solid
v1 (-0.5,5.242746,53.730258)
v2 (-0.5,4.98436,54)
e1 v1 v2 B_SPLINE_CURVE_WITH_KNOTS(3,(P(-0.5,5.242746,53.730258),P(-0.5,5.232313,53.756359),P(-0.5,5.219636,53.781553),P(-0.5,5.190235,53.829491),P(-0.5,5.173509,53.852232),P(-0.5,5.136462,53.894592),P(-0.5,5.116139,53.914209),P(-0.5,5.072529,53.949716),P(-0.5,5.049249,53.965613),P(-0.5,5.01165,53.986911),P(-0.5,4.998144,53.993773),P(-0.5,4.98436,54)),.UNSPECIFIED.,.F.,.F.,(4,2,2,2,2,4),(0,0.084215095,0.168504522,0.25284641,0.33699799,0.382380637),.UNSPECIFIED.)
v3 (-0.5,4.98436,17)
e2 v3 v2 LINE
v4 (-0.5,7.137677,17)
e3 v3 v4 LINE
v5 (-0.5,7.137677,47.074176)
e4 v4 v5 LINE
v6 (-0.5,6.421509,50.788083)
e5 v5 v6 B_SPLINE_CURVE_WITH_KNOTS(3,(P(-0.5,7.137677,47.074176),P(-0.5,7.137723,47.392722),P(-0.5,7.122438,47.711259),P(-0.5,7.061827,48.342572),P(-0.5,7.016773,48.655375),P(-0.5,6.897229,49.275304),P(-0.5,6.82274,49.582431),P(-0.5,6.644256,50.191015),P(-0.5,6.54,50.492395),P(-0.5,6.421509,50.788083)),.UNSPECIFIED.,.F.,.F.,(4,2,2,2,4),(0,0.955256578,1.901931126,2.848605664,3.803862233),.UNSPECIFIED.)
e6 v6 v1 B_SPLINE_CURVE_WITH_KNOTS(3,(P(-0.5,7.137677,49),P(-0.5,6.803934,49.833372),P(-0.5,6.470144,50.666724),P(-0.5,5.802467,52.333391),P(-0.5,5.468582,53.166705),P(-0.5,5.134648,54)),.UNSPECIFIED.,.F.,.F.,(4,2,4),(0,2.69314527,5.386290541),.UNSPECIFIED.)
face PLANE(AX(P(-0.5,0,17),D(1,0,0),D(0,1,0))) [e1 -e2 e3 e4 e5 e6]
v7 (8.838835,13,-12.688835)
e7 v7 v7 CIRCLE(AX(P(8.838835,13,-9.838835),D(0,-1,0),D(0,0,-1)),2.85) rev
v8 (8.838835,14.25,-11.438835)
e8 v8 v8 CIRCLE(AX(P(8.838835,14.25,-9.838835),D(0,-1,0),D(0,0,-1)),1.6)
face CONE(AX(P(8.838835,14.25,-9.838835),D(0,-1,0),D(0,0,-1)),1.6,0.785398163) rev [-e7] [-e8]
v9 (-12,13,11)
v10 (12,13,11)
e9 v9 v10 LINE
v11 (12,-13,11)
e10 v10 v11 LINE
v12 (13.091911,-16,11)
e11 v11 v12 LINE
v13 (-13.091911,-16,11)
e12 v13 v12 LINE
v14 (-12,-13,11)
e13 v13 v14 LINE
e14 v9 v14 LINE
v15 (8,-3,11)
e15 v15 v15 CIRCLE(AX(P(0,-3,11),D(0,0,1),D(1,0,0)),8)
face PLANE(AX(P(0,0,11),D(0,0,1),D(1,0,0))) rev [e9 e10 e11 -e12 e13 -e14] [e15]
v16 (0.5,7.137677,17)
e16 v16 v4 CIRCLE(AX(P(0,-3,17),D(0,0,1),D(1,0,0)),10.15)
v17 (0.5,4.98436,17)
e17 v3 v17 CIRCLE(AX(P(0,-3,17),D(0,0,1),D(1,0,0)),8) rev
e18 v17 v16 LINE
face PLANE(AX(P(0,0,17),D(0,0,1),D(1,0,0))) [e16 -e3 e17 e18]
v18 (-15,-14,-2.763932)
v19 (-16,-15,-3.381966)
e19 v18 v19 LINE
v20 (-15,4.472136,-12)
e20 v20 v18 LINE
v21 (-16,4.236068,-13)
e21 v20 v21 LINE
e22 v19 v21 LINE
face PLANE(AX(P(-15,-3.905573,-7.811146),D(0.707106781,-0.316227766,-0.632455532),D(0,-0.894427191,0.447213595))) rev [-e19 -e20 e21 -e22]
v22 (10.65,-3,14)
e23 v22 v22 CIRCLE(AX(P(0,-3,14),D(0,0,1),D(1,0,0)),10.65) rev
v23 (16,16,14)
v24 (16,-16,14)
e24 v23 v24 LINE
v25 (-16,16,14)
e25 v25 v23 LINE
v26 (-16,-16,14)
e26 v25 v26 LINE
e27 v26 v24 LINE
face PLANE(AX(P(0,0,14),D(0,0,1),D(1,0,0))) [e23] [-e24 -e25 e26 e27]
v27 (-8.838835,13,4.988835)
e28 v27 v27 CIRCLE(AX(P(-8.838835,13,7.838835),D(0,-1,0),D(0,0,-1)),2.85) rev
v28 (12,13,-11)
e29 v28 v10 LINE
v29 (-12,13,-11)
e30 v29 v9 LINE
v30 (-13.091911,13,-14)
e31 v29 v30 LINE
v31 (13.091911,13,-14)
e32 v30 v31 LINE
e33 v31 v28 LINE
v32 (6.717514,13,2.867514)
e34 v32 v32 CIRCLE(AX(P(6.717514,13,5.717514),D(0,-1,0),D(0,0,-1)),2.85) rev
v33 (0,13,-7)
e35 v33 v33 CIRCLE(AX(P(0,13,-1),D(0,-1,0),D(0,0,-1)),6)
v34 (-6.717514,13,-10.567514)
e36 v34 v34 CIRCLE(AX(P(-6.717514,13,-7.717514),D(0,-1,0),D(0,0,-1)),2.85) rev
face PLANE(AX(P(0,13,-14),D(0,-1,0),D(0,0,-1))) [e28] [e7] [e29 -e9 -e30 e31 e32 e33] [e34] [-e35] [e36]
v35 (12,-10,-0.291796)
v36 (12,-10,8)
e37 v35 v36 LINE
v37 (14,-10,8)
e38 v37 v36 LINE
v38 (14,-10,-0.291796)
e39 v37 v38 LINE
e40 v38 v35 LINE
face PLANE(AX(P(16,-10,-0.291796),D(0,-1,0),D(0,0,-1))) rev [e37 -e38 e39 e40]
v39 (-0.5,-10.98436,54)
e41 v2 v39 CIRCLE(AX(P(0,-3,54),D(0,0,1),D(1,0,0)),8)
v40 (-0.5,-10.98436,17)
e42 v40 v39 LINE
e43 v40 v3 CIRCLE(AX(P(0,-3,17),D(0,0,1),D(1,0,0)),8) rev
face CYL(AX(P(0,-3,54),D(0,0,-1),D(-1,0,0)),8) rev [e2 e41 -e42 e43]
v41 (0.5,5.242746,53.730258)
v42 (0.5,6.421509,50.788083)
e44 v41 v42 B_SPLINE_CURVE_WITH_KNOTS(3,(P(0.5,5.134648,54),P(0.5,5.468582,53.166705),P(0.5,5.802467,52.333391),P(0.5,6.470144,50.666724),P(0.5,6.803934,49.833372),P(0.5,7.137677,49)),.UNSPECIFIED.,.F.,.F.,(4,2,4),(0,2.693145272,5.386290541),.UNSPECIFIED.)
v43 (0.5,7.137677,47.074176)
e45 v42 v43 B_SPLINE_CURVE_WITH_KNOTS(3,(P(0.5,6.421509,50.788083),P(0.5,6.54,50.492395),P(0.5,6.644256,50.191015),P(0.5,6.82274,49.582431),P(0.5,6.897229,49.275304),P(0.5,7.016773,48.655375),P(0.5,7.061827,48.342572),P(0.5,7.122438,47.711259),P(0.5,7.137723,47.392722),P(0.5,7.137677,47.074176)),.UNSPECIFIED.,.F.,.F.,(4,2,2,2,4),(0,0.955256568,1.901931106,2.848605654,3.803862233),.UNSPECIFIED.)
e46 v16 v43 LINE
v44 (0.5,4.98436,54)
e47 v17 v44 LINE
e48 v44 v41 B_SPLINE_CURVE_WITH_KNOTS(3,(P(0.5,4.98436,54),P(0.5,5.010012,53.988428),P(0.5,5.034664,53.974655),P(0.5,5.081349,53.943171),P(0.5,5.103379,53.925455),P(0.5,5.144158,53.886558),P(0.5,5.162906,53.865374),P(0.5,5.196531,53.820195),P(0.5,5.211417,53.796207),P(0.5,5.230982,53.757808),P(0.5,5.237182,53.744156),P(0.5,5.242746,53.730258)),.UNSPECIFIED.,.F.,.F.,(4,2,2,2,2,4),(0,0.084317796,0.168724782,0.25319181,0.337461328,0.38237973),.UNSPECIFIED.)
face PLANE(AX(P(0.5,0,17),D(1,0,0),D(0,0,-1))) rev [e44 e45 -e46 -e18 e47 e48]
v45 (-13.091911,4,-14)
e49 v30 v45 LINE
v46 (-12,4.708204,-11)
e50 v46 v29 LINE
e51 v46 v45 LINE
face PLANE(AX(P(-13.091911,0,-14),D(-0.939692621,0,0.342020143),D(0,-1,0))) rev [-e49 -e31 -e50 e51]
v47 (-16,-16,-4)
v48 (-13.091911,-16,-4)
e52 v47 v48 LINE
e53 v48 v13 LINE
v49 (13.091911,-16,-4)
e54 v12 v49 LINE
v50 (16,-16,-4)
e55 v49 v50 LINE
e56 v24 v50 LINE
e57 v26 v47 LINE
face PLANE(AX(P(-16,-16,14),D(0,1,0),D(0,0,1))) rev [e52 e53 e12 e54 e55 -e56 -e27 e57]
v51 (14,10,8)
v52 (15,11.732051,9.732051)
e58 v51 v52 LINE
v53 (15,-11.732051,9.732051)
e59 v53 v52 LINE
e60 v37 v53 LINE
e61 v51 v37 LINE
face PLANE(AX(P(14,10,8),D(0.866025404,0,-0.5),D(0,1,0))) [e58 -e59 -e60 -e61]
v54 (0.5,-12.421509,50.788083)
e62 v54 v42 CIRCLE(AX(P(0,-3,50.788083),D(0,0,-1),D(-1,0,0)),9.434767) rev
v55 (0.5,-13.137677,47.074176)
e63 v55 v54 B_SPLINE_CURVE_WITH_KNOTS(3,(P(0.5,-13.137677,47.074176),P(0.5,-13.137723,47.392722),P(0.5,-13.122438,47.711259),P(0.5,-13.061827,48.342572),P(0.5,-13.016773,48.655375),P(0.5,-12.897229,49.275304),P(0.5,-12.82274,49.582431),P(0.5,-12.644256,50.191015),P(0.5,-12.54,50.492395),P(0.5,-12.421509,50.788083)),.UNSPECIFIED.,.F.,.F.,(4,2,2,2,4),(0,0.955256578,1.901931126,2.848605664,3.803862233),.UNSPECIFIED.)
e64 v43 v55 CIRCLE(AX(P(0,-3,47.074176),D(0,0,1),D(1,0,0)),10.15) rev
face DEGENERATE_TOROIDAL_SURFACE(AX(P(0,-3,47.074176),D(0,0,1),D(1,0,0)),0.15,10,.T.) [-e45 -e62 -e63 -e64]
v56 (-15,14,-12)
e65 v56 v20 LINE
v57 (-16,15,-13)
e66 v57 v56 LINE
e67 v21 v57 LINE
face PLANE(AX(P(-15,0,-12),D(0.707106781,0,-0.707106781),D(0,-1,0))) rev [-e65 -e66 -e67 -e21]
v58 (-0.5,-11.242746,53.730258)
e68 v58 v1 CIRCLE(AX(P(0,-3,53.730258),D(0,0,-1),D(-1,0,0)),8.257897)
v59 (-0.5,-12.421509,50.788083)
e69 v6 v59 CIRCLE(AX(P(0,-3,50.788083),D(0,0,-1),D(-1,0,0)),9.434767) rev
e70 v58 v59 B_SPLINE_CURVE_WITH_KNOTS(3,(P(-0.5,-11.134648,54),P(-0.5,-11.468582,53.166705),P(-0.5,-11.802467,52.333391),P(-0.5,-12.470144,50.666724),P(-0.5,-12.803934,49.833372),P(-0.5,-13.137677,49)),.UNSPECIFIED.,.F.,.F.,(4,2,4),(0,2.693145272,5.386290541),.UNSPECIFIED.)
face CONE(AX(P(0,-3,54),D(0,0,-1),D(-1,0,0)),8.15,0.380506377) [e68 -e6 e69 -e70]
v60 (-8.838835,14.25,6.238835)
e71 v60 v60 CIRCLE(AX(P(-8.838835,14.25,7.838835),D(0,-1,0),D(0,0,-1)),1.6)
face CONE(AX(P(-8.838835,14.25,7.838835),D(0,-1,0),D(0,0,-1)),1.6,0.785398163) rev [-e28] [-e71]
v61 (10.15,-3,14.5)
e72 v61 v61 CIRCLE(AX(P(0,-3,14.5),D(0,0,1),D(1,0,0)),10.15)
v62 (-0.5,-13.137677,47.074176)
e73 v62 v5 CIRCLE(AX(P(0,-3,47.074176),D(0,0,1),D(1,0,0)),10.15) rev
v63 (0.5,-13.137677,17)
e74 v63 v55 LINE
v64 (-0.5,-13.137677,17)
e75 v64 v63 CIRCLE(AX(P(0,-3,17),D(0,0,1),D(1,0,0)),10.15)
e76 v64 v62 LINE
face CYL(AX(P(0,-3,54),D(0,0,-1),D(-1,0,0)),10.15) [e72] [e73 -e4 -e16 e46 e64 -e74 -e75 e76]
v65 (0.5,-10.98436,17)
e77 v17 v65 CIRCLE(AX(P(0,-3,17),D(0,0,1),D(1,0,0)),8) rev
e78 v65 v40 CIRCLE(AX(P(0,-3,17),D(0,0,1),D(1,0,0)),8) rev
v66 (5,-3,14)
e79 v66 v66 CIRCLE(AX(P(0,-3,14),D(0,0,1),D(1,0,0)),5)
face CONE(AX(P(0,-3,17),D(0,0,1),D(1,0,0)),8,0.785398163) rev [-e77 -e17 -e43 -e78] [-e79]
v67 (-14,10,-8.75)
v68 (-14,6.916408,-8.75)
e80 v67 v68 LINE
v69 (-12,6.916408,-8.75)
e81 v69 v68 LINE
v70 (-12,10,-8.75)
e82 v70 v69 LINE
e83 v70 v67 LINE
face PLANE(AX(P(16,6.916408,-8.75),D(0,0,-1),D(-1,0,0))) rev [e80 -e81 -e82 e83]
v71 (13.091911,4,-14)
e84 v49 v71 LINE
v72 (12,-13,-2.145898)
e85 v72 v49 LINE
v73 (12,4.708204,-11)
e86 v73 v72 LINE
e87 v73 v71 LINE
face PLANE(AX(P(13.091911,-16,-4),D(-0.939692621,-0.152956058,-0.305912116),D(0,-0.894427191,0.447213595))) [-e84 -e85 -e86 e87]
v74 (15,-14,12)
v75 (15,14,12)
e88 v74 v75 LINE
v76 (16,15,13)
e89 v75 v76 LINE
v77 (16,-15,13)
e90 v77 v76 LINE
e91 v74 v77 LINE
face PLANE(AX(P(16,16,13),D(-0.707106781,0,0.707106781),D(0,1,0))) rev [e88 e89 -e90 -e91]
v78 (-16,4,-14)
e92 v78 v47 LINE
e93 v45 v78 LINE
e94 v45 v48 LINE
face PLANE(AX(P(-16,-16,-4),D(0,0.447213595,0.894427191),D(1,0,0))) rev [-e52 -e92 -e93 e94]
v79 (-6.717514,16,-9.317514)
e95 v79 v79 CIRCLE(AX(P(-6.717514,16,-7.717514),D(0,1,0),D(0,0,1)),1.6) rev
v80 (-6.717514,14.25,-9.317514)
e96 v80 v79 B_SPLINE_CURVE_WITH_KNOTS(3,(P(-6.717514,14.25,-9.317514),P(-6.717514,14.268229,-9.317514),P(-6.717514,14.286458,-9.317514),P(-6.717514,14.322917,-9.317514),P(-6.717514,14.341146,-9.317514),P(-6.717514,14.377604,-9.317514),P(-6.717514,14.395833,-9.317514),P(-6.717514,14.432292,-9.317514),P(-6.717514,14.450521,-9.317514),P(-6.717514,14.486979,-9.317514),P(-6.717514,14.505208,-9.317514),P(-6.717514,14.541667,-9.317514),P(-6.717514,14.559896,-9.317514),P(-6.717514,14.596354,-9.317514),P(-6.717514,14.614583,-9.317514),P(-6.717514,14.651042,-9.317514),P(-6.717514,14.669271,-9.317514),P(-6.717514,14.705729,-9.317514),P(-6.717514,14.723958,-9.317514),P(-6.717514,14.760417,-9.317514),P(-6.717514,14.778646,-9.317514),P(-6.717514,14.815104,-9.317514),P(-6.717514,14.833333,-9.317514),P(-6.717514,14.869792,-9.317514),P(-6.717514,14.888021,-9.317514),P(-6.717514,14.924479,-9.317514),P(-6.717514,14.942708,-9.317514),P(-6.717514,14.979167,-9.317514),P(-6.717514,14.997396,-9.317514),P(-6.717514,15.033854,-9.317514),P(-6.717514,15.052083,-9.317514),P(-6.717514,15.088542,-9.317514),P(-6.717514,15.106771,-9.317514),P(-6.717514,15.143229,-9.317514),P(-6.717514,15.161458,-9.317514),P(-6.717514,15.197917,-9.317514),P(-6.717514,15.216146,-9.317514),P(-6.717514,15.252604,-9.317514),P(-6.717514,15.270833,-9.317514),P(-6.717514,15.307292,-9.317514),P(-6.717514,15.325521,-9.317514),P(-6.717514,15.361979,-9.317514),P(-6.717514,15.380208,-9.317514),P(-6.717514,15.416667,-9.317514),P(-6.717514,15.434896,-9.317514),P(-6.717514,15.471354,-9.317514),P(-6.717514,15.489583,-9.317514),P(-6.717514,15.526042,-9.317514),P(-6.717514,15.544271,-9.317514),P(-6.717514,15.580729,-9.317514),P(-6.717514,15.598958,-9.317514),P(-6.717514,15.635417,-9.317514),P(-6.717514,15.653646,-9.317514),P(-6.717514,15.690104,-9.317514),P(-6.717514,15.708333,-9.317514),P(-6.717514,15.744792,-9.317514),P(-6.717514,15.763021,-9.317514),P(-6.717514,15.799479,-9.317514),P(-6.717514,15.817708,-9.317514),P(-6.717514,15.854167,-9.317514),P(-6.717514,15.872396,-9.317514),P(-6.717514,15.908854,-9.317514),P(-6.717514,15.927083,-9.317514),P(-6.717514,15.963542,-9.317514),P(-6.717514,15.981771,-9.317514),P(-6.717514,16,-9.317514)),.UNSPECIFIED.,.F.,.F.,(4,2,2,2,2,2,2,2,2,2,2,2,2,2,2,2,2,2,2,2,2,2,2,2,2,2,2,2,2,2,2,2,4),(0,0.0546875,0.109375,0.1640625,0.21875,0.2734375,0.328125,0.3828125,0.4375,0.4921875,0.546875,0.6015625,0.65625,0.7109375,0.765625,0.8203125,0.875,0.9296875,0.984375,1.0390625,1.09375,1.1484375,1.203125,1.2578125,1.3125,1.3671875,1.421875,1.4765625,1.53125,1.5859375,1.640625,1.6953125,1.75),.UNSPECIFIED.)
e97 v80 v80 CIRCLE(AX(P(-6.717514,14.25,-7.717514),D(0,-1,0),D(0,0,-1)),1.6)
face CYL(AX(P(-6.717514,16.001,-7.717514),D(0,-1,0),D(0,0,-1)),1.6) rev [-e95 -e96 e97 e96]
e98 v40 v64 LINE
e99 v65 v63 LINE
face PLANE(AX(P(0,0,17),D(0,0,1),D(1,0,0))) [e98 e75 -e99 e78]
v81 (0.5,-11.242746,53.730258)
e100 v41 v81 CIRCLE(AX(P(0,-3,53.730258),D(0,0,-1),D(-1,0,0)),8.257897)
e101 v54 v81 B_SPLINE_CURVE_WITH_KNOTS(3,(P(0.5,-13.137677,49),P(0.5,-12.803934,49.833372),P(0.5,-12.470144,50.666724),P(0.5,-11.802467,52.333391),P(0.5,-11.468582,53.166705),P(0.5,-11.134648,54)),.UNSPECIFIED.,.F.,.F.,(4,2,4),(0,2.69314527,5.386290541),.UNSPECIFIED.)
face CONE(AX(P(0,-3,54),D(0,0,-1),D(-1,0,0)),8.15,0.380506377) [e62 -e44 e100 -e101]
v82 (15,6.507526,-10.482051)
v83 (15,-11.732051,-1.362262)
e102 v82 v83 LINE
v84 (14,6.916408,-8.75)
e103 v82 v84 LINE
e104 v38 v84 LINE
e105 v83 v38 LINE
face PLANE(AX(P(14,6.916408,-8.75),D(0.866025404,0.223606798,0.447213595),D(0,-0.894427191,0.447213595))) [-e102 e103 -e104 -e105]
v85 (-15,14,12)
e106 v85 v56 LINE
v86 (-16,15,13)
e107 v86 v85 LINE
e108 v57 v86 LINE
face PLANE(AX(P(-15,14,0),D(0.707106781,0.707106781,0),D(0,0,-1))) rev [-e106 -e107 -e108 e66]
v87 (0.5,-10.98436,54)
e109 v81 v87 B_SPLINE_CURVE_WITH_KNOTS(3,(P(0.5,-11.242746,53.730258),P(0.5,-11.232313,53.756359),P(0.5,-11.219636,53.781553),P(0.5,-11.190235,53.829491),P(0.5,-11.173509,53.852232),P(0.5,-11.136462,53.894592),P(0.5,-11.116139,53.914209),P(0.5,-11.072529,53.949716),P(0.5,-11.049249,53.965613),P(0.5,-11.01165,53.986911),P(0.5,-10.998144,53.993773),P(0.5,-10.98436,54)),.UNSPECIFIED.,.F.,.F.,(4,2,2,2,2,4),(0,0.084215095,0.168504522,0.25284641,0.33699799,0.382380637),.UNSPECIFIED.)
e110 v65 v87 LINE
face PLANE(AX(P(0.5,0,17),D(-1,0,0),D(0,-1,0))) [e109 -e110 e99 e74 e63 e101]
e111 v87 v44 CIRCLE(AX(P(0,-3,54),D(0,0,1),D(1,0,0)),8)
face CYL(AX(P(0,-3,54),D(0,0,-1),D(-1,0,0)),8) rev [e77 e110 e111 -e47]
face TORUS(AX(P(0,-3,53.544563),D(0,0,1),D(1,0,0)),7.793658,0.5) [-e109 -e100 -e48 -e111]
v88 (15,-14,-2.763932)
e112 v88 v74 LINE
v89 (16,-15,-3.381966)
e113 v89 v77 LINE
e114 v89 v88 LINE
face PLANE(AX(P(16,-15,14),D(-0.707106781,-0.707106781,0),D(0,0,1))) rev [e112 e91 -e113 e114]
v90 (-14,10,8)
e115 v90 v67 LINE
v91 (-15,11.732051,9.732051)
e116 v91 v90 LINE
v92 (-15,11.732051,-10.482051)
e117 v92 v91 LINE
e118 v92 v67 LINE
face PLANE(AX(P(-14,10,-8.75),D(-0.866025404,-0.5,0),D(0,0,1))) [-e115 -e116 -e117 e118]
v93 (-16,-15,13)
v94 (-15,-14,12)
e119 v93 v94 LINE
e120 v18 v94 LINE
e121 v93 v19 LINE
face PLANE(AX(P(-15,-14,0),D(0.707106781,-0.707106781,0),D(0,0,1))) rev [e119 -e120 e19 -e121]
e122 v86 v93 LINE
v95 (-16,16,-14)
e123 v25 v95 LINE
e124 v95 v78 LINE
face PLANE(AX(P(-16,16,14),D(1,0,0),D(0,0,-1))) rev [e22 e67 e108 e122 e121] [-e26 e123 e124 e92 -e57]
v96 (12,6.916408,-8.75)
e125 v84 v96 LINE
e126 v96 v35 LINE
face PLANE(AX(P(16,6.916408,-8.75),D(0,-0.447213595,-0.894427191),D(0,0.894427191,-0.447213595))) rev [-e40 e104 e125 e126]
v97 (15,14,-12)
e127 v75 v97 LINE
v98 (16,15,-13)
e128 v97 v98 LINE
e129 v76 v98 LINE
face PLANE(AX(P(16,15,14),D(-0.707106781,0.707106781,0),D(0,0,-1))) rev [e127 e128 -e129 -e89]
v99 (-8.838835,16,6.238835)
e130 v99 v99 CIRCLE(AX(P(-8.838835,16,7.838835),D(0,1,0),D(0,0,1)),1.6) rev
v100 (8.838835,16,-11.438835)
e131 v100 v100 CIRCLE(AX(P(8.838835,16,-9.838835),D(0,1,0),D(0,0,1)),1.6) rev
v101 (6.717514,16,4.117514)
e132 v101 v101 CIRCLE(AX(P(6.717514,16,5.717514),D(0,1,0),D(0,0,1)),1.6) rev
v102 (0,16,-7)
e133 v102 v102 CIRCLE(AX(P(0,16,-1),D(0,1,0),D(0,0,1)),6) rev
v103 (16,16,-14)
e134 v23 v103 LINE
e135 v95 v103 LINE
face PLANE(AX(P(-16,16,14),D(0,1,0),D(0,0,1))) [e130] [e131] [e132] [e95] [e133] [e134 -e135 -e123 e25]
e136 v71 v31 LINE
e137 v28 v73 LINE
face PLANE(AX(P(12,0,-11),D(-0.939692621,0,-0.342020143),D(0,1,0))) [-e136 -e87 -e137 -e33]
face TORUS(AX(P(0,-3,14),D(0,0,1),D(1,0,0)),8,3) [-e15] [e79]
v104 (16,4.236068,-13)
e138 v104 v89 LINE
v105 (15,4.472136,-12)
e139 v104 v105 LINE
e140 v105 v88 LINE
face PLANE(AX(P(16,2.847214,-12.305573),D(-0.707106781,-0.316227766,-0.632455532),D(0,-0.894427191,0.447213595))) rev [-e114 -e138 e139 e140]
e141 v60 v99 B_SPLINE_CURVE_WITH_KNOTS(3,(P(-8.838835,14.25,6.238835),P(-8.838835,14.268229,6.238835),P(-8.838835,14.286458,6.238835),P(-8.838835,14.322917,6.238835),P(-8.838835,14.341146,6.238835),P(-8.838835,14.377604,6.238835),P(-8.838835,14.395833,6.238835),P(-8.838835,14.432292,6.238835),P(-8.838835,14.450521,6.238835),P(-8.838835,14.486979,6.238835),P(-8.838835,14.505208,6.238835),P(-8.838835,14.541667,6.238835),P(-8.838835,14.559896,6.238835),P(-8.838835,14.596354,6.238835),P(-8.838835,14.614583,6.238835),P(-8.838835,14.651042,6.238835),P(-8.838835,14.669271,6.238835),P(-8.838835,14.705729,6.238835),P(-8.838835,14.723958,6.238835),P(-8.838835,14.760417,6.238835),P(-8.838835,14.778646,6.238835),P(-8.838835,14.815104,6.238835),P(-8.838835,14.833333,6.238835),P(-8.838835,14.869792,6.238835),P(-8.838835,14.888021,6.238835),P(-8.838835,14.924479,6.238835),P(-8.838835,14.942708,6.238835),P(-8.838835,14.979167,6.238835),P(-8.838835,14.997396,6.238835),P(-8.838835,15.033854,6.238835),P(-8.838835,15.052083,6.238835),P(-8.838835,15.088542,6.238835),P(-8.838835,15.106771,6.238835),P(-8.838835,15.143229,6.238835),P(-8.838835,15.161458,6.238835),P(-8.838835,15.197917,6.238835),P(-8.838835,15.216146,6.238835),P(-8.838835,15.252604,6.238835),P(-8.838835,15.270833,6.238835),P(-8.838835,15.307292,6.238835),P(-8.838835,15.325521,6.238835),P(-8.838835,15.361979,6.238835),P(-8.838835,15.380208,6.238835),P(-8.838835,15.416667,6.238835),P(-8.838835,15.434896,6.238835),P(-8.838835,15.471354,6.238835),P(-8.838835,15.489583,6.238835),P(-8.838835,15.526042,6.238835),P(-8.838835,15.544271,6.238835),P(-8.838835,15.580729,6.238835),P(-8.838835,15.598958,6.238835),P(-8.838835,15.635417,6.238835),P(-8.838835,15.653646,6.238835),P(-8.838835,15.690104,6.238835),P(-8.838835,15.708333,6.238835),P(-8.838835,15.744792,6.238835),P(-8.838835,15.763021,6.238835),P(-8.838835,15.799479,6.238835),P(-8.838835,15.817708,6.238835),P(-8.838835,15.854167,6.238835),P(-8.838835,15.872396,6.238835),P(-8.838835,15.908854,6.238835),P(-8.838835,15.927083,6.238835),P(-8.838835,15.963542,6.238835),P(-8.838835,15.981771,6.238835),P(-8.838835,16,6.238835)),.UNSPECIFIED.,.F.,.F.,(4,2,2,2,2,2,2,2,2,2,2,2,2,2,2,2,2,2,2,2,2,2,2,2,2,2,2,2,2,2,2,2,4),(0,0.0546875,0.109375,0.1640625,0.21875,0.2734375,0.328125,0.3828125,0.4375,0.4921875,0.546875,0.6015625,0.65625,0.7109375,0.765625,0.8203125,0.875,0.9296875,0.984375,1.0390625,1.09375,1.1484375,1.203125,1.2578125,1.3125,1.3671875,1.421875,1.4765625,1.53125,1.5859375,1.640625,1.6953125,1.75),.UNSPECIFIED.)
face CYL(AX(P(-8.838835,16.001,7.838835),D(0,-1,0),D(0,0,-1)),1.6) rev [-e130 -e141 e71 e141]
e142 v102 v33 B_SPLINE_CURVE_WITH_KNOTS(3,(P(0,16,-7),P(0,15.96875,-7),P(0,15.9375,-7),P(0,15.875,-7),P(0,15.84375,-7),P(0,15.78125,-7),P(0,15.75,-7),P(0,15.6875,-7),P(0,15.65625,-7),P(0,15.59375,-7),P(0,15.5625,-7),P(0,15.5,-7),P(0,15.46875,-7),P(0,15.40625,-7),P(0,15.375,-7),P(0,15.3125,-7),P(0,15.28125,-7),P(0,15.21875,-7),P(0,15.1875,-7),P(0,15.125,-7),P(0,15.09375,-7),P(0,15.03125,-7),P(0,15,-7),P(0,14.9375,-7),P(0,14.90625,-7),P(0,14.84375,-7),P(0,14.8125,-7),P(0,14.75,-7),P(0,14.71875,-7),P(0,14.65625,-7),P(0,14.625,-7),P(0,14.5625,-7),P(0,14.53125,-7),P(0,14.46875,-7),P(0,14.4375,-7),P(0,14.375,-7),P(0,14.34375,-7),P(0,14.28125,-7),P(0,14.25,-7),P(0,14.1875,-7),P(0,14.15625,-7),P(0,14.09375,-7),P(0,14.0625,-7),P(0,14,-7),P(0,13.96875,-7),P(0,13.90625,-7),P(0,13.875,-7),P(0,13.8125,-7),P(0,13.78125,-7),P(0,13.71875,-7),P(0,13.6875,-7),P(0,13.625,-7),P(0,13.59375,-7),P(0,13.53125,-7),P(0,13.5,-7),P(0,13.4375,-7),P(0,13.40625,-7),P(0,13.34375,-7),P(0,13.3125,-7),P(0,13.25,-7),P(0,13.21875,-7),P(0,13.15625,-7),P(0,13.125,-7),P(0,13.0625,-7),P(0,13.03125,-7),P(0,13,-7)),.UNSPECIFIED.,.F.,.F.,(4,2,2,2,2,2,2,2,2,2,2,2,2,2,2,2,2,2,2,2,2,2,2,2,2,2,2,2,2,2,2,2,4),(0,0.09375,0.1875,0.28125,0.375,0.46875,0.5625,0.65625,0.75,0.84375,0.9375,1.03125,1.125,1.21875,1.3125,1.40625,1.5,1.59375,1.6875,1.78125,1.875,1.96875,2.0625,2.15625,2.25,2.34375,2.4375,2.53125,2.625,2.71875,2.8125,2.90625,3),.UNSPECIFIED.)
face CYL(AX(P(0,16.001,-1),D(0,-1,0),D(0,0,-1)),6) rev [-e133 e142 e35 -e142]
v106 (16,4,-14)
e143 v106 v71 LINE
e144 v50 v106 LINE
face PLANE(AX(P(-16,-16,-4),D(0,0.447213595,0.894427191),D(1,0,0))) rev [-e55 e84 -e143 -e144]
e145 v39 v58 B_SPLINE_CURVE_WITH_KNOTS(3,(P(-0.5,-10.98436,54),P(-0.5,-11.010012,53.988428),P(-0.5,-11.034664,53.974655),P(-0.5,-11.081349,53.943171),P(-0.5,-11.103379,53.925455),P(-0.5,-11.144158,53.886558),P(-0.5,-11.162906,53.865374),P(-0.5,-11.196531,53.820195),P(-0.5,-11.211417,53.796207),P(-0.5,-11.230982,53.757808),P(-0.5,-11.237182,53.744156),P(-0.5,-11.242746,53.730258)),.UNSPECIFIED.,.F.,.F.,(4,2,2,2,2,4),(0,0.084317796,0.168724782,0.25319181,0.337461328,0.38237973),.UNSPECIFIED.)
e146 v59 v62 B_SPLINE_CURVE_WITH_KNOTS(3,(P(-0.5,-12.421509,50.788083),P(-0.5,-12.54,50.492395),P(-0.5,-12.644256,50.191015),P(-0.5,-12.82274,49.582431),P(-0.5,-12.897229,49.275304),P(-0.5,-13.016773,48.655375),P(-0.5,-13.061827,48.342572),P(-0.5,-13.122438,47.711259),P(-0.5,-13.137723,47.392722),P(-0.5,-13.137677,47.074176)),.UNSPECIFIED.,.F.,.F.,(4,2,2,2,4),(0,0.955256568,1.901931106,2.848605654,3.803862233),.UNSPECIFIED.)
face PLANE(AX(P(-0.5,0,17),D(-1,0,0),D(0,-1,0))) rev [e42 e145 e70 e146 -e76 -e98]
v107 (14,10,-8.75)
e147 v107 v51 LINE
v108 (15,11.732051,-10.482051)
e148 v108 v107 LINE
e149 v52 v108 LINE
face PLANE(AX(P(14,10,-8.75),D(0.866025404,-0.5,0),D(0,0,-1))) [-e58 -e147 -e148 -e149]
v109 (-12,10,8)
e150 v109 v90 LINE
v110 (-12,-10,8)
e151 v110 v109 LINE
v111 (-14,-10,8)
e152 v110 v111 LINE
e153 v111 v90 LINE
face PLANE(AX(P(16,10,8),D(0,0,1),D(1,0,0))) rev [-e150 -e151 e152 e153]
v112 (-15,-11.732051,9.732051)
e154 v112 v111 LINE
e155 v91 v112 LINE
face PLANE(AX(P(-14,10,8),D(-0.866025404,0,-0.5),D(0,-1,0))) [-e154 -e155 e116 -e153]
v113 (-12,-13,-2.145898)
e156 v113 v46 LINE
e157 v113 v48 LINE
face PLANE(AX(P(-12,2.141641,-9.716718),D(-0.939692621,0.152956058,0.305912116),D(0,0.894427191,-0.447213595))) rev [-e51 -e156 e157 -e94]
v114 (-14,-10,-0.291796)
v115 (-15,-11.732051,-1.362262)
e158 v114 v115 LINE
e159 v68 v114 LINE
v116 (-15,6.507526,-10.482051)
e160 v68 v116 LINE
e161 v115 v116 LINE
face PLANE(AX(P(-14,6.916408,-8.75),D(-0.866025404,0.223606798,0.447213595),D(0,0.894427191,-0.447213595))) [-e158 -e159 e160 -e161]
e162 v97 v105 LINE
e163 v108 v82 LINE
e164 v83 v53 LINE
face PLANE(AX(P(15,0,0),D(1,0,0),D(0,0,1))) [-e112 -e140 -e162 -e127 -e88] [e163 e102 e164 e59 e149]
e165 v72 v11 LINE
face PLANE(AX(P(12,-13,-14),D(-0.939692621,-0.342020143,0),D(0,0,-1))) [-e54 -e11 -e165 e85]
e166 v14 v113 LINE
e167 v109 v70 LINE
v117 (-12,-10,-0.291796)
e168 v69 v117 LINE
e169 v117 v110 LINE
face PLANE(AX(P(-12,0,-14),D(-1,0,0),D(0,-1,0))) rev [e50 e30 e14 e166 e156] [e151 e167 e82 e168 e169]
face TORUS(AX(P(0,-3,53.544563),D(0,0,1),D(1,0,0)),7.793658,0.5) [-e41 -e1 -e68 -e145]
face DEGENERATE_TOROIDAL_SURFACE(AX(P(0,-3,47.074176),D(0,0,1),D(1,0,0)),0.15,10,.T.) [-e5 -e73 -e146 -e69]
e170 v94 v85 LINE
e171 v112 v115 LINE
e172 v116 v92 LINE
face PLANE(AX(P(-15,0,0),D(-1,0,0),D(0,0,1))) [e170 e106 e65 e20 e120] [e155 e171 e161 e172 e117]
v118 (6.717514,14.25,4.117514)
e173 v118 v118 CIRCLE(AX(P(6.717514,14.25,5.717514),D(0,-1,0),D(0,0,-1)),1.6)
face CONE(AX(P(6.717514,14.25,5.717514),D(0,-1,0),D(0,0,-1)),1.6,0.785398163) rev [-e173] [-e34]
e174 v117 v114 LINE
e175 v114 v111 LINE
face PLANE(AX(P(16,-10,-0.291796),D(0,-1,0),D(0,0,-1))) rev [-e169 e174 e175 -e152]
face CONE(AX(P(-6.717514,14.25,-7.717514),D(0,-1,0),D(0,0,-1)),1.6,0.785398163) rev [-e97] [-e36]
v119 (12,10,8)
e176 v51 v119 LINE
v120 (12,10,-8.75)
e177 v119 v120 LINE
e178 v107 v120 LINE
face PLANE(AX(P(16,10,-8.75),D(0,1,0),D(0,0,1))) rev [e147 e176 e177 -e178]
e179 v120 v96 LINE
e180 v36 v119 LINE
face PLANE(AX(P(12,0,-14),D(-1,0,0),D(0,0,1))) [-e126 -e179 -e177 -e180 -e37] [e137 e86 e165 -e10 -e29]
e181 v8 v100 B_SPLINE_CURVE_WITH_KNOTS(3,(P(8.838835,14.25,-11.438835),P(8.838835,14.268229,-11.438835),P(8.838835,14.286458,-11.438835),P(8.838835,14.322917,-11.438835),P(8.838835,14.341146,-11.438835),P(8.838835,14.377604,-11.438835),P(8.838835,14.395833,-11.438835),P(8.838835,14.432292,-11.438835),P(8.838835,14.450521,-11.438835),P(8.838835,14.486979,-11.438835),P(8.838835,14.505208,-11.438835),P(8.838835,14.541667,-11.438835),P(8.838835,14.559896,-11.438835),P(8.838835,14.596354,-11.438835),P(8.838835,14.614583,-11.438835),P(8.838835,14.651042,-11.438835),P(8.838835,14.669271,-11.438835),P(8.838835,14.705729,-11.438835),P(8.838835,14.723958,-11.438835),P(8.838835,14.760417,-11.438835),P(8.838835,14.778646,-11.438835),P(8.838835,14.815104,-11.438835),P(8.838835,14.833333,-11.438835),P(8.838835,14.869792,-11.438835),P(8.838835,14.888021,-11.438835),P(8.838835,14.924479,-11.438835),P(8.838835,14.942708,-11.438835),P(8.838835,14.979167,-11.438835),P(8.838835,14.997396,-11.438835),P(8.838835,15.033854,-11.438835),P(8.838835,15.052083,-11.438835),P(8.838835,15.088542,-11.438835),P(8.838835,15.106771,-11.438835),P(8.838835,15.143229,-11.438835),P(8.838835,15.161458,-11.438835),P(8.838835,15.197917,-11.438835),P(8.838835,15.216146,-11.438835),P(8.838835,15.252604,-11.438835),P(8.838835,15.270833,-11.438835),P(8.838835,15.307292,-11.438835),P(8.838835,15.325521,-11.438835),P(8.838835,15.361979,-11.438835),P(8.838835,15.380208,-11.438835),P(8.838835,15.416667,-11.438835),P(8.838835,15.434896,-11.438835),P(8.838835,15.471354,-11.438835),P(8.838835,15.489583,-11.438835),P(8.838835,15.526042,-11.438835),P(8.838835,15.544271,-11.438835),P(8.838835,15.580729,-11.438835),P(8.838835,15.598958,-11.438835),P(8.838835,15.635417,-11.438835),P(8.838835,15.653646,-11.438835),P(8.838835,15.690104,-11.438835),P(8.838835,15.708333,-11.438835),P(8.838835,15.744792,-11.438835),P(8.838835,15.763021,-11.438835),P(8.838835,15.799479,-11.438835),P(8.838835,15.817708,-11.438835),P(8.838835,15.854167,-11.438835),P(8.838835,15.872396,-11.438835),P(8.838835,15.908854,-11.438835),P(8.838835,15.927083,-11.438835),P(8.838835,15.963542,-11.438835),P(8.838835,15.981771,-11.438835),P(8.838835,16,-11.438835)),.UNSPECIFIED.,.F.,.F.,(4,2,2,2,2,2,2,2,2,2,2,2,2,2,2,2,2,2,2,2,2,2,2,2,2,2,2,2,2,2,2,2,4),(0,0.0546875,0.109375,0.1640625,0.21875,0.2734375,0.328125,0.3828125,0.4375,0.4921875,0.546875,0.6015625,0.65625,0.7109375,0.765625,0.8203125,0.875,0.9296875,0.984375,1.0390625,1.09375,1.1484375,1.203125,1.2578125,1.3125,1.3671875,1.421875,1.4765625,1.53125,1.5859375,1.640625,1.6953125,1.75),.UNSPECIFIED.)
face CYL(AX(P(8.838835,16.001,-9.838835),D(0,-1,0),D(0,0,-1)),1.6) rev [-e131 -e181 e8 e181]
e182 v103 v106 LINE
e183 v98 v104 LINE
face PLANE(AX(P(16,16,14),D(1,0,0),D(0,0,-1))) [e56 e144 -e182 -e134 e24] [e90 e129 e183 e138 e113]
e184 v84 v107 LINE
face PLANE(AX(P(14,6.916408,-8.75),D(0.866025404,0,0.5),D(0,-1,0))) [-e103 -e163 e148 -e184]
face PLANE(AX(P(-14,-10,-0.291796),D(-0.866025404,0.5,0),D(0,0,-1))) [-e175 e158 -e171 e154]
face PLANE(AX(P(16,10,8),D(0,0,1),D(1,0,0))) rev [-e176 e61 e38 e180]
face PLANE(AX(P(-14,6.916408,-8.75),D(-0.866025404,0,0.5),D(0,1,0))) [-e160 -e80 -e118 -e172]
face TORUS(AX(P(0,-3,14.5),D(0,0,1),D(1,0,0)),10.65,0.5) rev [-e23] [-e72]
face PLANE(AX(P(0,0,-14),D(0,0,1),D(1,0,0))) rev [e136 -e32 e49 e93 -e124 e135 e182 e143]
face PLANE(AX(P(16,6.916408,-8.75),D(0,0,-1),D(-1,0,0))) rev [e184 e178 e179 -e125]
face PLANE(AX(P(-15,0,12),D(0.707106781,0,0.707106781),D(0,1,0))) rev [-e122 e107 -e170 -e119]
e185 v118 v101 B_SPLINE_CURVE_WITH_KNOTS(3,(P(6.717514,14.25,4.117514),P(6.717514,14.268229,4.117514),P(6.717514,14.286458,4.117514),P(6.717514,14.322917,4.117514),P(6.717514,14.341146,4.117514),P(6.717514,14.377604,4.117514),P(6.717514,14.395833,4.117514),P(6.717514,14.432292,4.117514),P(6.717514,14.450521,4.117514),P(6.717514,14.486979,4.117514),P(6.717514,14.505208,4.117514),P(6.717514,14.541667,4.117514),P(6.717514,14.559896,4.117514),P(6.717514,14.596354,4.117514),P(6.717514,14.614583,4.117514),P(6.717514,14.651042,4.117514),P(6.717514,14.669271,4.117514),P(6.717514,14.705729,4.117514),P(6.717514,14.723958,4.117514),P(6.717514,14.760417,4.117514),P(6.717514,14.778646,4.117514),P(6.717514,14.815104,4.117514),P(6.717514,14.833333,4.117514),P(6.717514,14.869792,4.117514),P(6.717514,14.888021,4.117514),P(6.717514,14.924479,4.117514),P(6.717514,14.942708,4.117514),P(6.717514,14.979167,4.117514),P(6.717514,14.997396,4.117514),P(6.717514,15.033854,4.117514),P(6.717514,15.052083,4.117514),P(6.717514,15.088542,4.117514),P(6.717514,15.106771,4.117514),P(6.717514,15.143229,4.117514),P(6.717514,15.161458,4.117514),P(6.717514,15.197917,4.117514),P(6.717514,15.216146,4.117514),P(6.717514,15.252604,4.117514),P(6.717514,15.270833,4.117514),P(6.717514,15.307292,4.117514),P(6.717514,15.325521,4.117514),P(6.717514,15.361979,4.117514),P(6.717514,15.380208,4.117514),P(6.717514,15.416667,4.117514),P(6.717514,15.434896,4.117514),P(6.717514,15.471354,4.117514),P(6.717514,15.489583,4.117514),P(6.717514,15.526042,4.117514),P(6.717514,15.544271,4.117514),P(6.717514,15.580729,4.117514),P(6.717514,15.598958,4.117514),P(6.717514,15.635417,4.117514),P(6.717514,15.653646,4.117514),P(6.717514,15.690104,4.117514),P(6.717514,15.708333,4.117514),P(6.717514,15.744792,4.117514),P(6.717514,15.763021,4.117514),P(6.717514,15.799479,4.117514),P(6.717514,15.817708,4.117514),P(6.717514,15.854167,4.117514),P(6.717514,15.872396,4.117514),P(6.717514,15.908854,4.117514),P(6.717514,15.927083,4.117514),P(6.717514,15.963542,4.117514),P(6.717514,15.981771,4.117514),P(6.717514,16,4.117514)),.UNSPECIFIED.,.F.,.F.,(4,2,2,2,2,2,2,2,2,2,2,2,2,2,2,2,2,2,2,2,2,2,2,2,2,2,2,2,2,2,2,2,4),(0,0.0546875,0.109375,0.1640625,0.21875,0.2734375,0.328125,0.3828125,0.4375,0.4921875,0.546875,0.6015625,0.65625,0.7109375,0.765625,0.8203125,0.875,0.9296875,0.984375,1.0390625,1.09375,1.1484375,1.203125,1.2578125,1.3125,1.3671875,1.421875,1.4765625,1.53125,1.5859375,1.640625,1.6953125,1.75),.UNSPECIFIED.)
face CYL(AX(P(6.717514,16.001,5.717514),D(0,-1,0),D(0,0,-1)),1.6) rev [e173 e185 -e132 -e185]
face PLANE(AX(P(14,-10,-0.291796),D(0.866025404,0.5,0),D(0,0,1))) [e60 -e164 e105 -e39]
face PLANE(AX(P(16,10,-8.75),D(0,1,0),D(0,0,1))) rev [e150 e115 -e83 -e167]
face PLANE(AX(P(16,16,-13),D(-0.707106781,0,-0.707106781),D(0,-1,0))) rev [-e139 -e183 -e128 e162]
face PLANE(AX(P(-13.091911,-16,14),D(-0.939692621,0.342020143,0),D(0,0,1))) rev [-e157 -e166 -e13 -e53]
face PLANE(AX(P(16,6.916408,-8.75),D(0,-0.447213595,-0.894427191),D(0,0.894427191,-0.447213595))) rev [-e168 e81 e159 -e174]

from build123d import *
from OCP.BRepFilletAPI import BRepFilletAPI_MakeChamfer

# Parameters (mm, degrees)
ESQUISSE1_W              = 32
ESQUISSE1_H              = 32
BOSS_EXTRU_1_DEPTH       = 14
CHANFREIN1_SIZE          = 20
CHANFREIN1_SIZE2         = 10
ENL_V_MAT_EXTRU_1_DEPTH  = 1
ESQUISSE11_W             = 12
ESQUISSE11_H             = 29
ENL_V_MAT_EXTRU_4_DEPTH  = 34.7194306
CHANFREIN41_SIZE         = 1
ENL_V_MAT_EXTRU_13_DEPTH = 38.589892258
CHANFREIN63_SIZE         = 1
CHANFREIN63_SIZE2        = 1.732050808
ESQUISSE32_R             = 10.15
ESQUISSE32_R_2           = 8
BOSS_EXTRU_2_DEPTH       = 40
ENL_V_START              = -37
ENL_V_MAT_EXTRU_17_DEPTH = 37
CHANFREIN50_SIZE         = 5
CHANFREIN50_SIZE2        = 2
CONG_4_R                 = 0.5
CONG_5_R                 = 10
CONG_6_R                 = 0.5
ENL_V_MAT_EXTRU_45_REACH = 65.348
ESQUISSE71_R             = 6
ESQUISSE71_R_2           = 1.6
CHANFREIN64_SIZE         = 1.25
CHAMFER1_SIZE            = 3
SKETCH4_R                = 5
CUT_EXTRUDE1_DEPTH       = 46.956501259
FILLET2_R                = 3
CHAMFER2_SIZE            = 3
CHAMFER2_SIZE2           = 1.091910703


# Some blends are built 0.0001 mm under size
with BuildPart() as part:
    # Esquisse1 → Boss.-Extru.1 (new, symmetric)
    with BuildSketch(Plane.XY):
        Rectangle(ESQUISSE1_W, ESQUISSE1_H)
    extrude(amount=BOSS_EXTRU_1_DEPTH, both=True)

    # Chanfrein1
    chanfrein1_edges = [part.edges().sort_by_distance(p)[0] for p in [
        (0, -16, -14),
    ]]
    chanfrein1_side = [part.faces().sort_by_distance(p)[0] for p in [
        (0, 0, -14),
    ]]
    chamfer(chanfrein1_edges, length=CHANFREIN1_SIZE, length2=CHANFREIN1_SIZE2, reference=chanfrein1_side[0])

    # Esquisse5 → Enlèv. mat.-Extru.1 (cut)
    with BuildSketch(Plane.ZY.offset(16)):
        Polygon((-12, 14), (-12, 4.472135955), (-2.763932023, -14), (12, -14), (12, 14), align=None)
    enl_v_mat_extru_1 = extrude(amount=-ENL_V_MAT_EXTRU_1_DEPTH, mode=Mode.SUBTRACT)

    # Symétrie1: Enlèv. mat.-Extru.1 across plane
    add(enl_v_mat_extru_1.mirror(Plane(origin=(0, 0, 0), x_dir=(0, 0, 1), z_dir=(1, 0, 0))), mode=Mode.SUBTRACT)

    # Esquisse11 → Enlèv. mat.-Extru.4 (cut, through all)
    with BuildSketch(Plane.XY.offset(11)):
        with Locations((-6, -1.5)):
            Rectangle(ESQUISSE11_W, ESQUISSE11_H)
        with Locations((6, -1.5)):
            Rectangle(ESQUISSE11_W, ESQUISSE11_H)
    extrude(amount=-ENL_V_MAT_EXTRU_4_DEPTH, mode=Mode.SUBTRACT)

    # Chanfrein41
    chanfrein41_edges = [part.edges().sort_by_distance(p)[0] for p in [
        (16, -4.763932023, -7.381966011),
        (16, 0, 12),
        (16, 14, 0),
        (16, 9.236067977, -12),
        (-16, 0, 12),
        (-16, -4.763932023, -7.381966011),
        (-16, 14, 0),
        (-16, 9.236067977, -12),
        (16, -14, 4.618033989),
        (-16, -14, 4.618033989),
    ]]
    chamfer(chanfrein41_edges, length=CHANFREIN41_SIZE - 0.0001)  # a hair under: the kernel refuses the full size

    # Esquisse24 → Enlèv. mat.-Extru.13 (cut, through all)
    with BuildSketch(Plane.ZY.offset(15)):
        Polygon((-8.75, 6.916407865), (-8.75, 10), (8, 10), (8, -10), (-0.291796068, -10), align=None)
    extrude(amount=-ENL_V_MAT_EXTRU_13_DEPTH, mode=Mode.SUBTRACT)

    # Chanfrein63: one chamfer whose edges measure the first distance from different faces: ONE call of the kernel's chamfer builder (chamfer() names one face for all edges)
    chanfrein63_edges_1 = [part.edges().sort_by_distance(p)[0] for p in [
        (15, 10, -0.375),
    ]]
    chanfrein63_side_1 = [part.faces().sort_by_distance(p)[0] for p in [
        (13.5, 10, -0.375),
    ]]
    chanfrein63_edges_2 = [part.edges().sort_by_distance(p)[0] for p in [
        (15, 0, 8),
    ]]
    chanfrein63_side_2 = [part.faces().sort_by_distance(p)[0] for p in [
        (13.5, 0, 8),
    ]]
    chanfrein63_edges_3 = [part.edges().sort_by_distance(p)[0] for p in [
        (15, -10, 3.854101966),
    ]]
    chanfrein63_side_3 = [part.faces().sort_by_distance(p)[0] for p in [
        (13.5, -10, 3.854101966),
    ]]
    chanfrein63_edges_4 = [part.edges().sort_by_distance(p)[0] for p in [
        (15, -1.541796068, -4.520898034),
    ]]
    chanfrein63_side_4 = [part.faces().sort_by_distance(p)[0] for p in [
        (13.5, -1.541796068, -4.520898034),
    ]]
    chanfrein63_edges_5 = [part.edges().sort_by_distance(p)[0] for p in [
        (15, 8.458203932, -8.75),
    ]]
    chanfrein63_side_5 = [part.faces().sort_by_distance(p)[0] for p in [
        (13.5, 8.458203932, -8.75),
    ]]
    chanfrein63_edges_6 = [part.edges().sort_by_distance(p)[0] for p in [
        (-15, 10, -0.375),
    ]]
    chanfrein63_side_6 = [part.faces().sort_by_distance(p)[0] for p in [
        (-13.5, 10, -0.375),
    ]]
    chanfrein63_edges_7 = [part.edges().sort_by_distance(p)[0] for p in [
        (-15, 8.458203932, -8.75),
    ]]
    chanfrein63_side_7 = [part.faces().sort_by_distance(p)[0] for p in [
        (-13.5, 8.458203932, -8.75),
    ]]
    chanfrein63_edges_8 = [part.edges().sort_by_distance(p)[0] for p in [
        (-15, -1.541796068, -4.520898034),
    ]]
    chanfrein63_side_8 = [part.faces().sort_by_distance(p)[0] for p in [
        (-13.5, -1.541796068, -4.520898034),
    ]]
    chanfrein63_edges_9 = [part.edges().sort_by_distance(p)[0] for p in [
        (-15, -10, 3.854101966),
    ]]
    chanfrein63_side_9 = [part.faces().sort_by_distance(p)[0] for p in [
        (-13.5, -10, 3.854101966),
    ]]
    chanfrein63_edges_10 = [part.edges().sort_by_distance(p)[0] for p in [
        (-15, 0, 8),
    ]]
    chanfrein63_side_10 = [part.faces().sort_by_distance(p)[0] for p in [
        (-13.5, 0, 8),
    ]]
    chanfrein63 = BRepFilletAPI_MakeChamfer(part.part.solid().wrapped)
    for e in chanfrein63_edges_1:
        chanfrein63.Add(CHANFREIN63_SIZE, CHANFREIN63_SIZE2, e.wrapped, chanfrein63_side_1[0].wrapped)  # the first distance lies on this face
    for e in chanfrein63_edges_2:
        chanfrein63.Add(CHANFREIN63_SIZE, CHANFREIN63_SIZE2, e.wrapped, chanfrein63_side_2[0].wrapped)  # the first distance lies on this face
    for e in chanfrein63_edges_3:
        chanfrein63.Add(CHANFREIN63_SIZE, CHANFREIN63_SIZE2, e.wrapped, chanfrein63_side_3[0].wrapped)  # the first distance lies on this face
    for e in chanfrein63_edges_4:
        chanfrein63.Add(CHANFREIN63_SIZE, CHANFREIN63_SIZE2, e.wrapped, chanfrein63_side_4[0].wrapped)  # the first distance lies on this face
    for e in chanfrein63_edges_5:
        chanfrein63.Add(CHANFREIN63_SIZE, CHANFREIN63_SIZE2, e.wrapped, chanfrein63_side_5[0].wrapped)  # the first distance lies on this face
    for e in chanfrein63_edges_6:
        chanfrein63.Add(CHANFREIN63_SIZE, CHANFREIN63_SIZE2, e.wrapped, chanfrein63_side_6[0].wrapped)  # the first distance lies on this face
    for e in chanfrein63_edges_7:
        chanfrein63.Add(CHANFREIN63_SIZE, CHANFREIN63_SIZE2, e.wrapped, chanfrein63_side_7[0].wrapped)  # the first distance lies on this face
    for e in chanfrein63_edges_8:
        chanfrein63.Add(CHANFREIN63_SIZE, CHANFREIN63_SIZE2, e.wrapped, chanfrein63_side_8[0].wrapped)  # the first distance lies on this face
    for e in chanfrein63_edges_9:
        chanfrein63.Add(CHANFREIN63_SIZE, CHANFREIN63_SIZE2, e.wrapped, chanfrein63_side_9[0].wrapped)  # the first distance lies on this face
    for e in chanfrein63_edges_10:
        chanfrein63.Add(CHANFREIN63_SIZE, CHANFREIN63_SIZE2, e.wrapped, chanfrein63_side_10[0].wrapped)  # the first distance lies on this face
    add(Compound.cast(chanfrein63.Shape()), mode=Mode.REPLACE)

    # Esquisse32 → Boss.-Extru.2 (add)
    with BuildSketch(Plane.XY.offset(14)):
        with Locations((0, -3)):
            Circle(ESQUISSE32_R)
        with Locations((0, -3)):
            Circle(ESQUISSE32_R_2, mode=Mode.SUBTRACT)
    extrude(amount=BOSS_EXTRU_2_DEPTH)

    # Esquisse35 → Enlèv. mat.-Extru.17 (cut)
    with BuildSketch(Plane.XY.offset(54).offset(ENL_V_START)):
        with BuildLine():
            ThreePointArc((-0.5, 4.984359711), (0, 5), (0.5, 4.984359711))
            Line((0.5, 4.984359711), (0.5, 7.137677249))
            ThreePointArc((0.5, 7.137677249), (0, 7.15), (-0.5, 7.137677249))
            Line((-0.5, 7.137677249), (-0.5, 4.984359711))
        make_face()
        with BuildLine():
            Line((0.5, -13.137677249), (0.5, -10.984359711))
            ThreePointArc((0.5, -10.984359711), (0, -11), (-0.5, -10.984359711))
            Line((-0.5, -10.984359711), (-0.5, -13.137677249))
            ThreePointArc((-0.5, -13.137677249), (0, -13.15), (0.5, -13.137677249))
        make_face()
    extrude(amount=ENL_V_MAT_EXTRU_17_DEPTH, mode=Mode.SUBTRACT)

    # Chanfrein50
    chanfrein50_edges = [part.edges().sort_by_distance(p)[0] for p in [
        (-10.15, -3, 54),
        (7.351785497, 3.998124749, 54),
    ]]
    chanfrein50_side = [part.faces().sort_by_distance(p)[0] for p in [
        (-10.15, -3, 34),
    ]]
    chamfer(chanfrein50_edges, length=CHANFREIN50_SIZE, length2=CHANFREIN50_SIZE2, reference=chanfrein50_side[0])

    # Congé4
    # the kernel refuses this fillet: 0.5 mm, written as the material it takes off along each edge
    with BuildSketch(Plane(origin=(0, -3, 54), x_dir=(0.02785735277538292, 0.9996119086407224, 0), z_dir=(0.9996119086407224, -0.02785735277538292, 0))) as cong_4_piece_1:
        with BuildLine():
            CenterArc((7.793658453, -0.455437335), CONG_4_R, 21.801409486, 43.825096166)
            Line((8.257896799, -0.269741997), (8.267181566, -0.26602809))
            Line((8.267181566, -0.26602809), (8.159284767, 0.003713907))
            Line((8.159284767, 0.003713907), (8.15, 0.01))
            ThreePointArc((8.15, 0.01), (8.075, 0.01), (8.004126831, 0.009108747))
            Line((8.004126831, 0.009108747), (8, 0))
        make_face()
    revolve(axis=Axis((0, -3, 54), (0, 0, 1)), revolution_arc=183.192630506, mode=Mode.SUBTRACT)
    with BuildSketch(Plane(origin=(0, -3, 54), x_dir=(-0.02785735277538078, 0.9996119086407226, 0), z_dir=(-0.9996119086407226, -0.02785735277538078, 0))) as cong_4_piece_2:
        with BuildLine():
            CenterArc((7.793658453, 0.455437335), CONG_4_R, 294.373494347, 43.825096166)
            Line((8.257896799, 0.269741997), (8.267181566, 0.26602809))
            Line((8.267181566, 0.26602809), (8.159284767, -0.003713907))
            Line((8.159284767, -0.003713907), (8.15, -0.01))
            ThreePointArc((8.15, -0.01), (8.075, -0.01), (8.004126831, -0.009108747))
            Line((8.004126831, -0.009108747), (8, 0))
        make_face()
    revolve(axis=Axis((0, -3, 54), (0, 0, -1)), revolution_arc=183.192630506, mode=Mode.SUBTRACT)

    # Congé5
    cong_5_edges = [part.edges().sort_by_distance(p)[0] for p in [
        (7.351785497, 3.998124749, 49),
        (-10.15, -3, 49),
    ]]
    fillet(cong_5_edges, radius=CONG_5_R)

    # Congé6
    cong_6_edges = [part.edges().sort_by_distance(p)[0] for p in [
        (-10.15, -3, 14),
    ]]
    fillet(cong_6_edges, radius=CONG_6_R)

    # Esquisse71 → Enlèv. mat.-Extru.45 (cut, up to next)
    with BuildSketch(Plane.XZ.offset(-13), mode=Mode.PRIVATE) as enl_v_mat_extru_45_sk1:
        with Locations(Location((0, -1, 0), (0, 0, 270))):
            Circle(ESQUISSE71_R)
    enl_v_mat_extru_45_tool1 = extrude(enl_v_mat_extru_45_sk1.sketch, amount=-ENL_V_MAT_EXTRU_45_REACH, mode=Mode.PRIVATE) & part.part
    # Esquisse71 → Enlèv. mat.-Extru.45 (cut, up to next)
    with BuildSketch(Plane.XZ.offset(-13), mode=Mode.PRIVATE) as enl_v_mat_extru_45_sk2:
        with Locations(Location((8.838834765, -9.838834765, 0), (0, 0, 270))):
            Circle(ESQUISSE71_R_2)
    enl_v_mat_extru_45_tool2 = extrude(enl_v_mat_extru_45_sk2.sketch, amount=-ENL_V_MAT_EXTRU_45_REACH, mode=Mode.PRIVATE) & part.part
    # Esquisse71 → Enlèv. mat.-Extru.45 (cut, up to next)
    with BuildSketch(Plane.XZ.offset(-13), mode=Mode.PRIVATE) as enl_v_mat_extru_45_sk3:
        with Locations(Location((-8.838834765, 7.838834765, 0), (0, 0, 270))):
            Circle(ESQUISSE71_R_2)
    enl_v_mat_extru_45_tool3 = extrude(enl_v_mat_extru_45_sk3.sketch, amount=-ENL_V_MAT_EXTRU_45_REACH, mode=Mode.PRIVATE) & part.part
    # Esquisse71 → Enlèv. mat.-Extru.45 (cut, up to next)
    with BuildSketch(Plane.XZ.offset(-13), mode=Mode.PRIVATE) as enl_v_mat_extru_45_sk4:
        with Locations(Location((-6.717514421, -7.717514421, 0), (0, 0, 270))):
            Circle(ESQUISSE71_R_2)
    enl_v_mat_extru_45_tool4 = extrude(enl_v_mat_extru_45_sk4.sketch, amount=-ENL_V_MAT_EXTRU_45_REACH, mode=Mode.PRIVATE) & part.part
    # Esquisse71 → Enlèv. mat.-Extru.45 (cut, up to next)
    with BuildSketch(Plane.XZ.offset(-13), mode=Mode.PRIVATE) as enl_v_mat_extru_45_sk5:
        with Locations(Location((6.717514421, 5.717514421, 0), (0, 0, 270))):
            Circle(ESQUISSE71_R_2)
    enl_v_mat_extru_45_tool5 = extrude(enl_v_mat_extru_45_sk5.sketch, amount=-ENL_V_MAT_EXTRU_45_REACH, mode=Mode.PRIVATE) & part.part
    add(enl_v_mat_extru_45_tool1.solids().sort_by_distance((0, 13, -1))[0], mode=Mode.SUBTRACT)
    add(enl_v_mat_extru_45_tool2.solids().sort_by_distance((8.838835, 13, -9.838835))[0], mode=Mode.SUBTRACT)
    add(enl_v_mat_extru_45_tool3.solids().sort_by_distance((-8.838835, 13, 7.838835))[0], mode=Mode.SUBTRACT)
    add(enl_v_mat_extru_45_tool4.solids().sort_by_distance((-6.717514, 13, -7.717514))[0], mode=Mode.SUBTRACT)
    add(enl_v_mat_extru_45_tool5.solids().sort_by_distance((6.717514, 13, 5.717514))[0], mode=Mode.SUBTRACT)

    # Chanfrein64
    chanfrein64_edges = [part.edges().sort_by_distance(p)[0] for p in [
        (8.838834765, 13, -8.238834765),
        (-8.838834765, 13, 9.438834765),
        (-6.717514421, 13, -6.117514421),
        (6.717514421, 13, 7.317514421),
    ]]
    chamfer(chanfrein64_edges, length=CHANFREIN64_SIZE)

    # Chamfer1
    chamfer1_edges = [part.edges().sort_by_distance(p)[0] for p in [
        (-8, -3, 14),
    ]]
    chamfer(chamfer1_edges, length=CHAMFER1_SIZE - 0.0001)  # a hair under: the kernel refuses the full size

    # Sketch4 → Cut-Extrude1 (cut, through all)
    with BuildSketch(Plane.XY.offset(14)):
        with Locations((0, -3)):
            Circle(SKETCH4_R)
    extrude(amount=-CUT_EXTRUDE1_DEPTH, mode=Mode.SUBTRACT)

    # Fillet2
    fillet2_edges = [part.edges().sort_by_distance(p)[0] for p in [
        (-5, -3, 11),
    ]]
    fillet(fillet2_edges, radius=FILLET2_R - 0.0001)  # a hair under: the kernel refuses the full size

    # Chamfer2: one chamfer whose edges measure the first distance from different faces: ONE call of the kernel's chamfer builder (chamfer() names one face for all edges)
    chamfer2_edges_1 = [part.edges().sort_by_distance(p)[0] for p in [
        (12, -6, -9),
        (12, -16, 3.5),
        (12, 8.5, -14),
    ]]
    chamfer2_side_1 = [part.faces().sort_by_distance(p)[0] for p in [
        (12, -1.5, 10.617116206),
    ]]
    chamfer2_edges_2 = [part.edges().sort_by_distance(p)[0] for p in [
        (-12, -6, -9),
        (-12, -16, 3.5),
        (-12, 8.5, -14),
    ]]
    chamfer2_side_2 = [part.faces().sort_by_distance(p)[0] for p in [
        (-12, -1.5, 10.617116206),
    ]]
    chamfer2 = BRepFilletAPI_MakeChamfer(part.part.solid().wrapped)
    for e in chamfer2_edges_1:
        chamfer2.Add(CHAMFER2_SIZE, CHAMFER2_SIZE2, e.wrapped, chamfer2_side_1[0].wrapped)  # the first distance lies on this face
    for e in chamfer2_edges_2:
        chamfer2.Add(CHAMFER2_SIZE, CHAMFER2_SIZE2, e.wrapped, chamfer2_side_2[0].wrapped)  # the first distance lies on this face
    add(Compound.cast(chamfer2.Shape()), mode=Mode.REPLACE)


solid = part.part
